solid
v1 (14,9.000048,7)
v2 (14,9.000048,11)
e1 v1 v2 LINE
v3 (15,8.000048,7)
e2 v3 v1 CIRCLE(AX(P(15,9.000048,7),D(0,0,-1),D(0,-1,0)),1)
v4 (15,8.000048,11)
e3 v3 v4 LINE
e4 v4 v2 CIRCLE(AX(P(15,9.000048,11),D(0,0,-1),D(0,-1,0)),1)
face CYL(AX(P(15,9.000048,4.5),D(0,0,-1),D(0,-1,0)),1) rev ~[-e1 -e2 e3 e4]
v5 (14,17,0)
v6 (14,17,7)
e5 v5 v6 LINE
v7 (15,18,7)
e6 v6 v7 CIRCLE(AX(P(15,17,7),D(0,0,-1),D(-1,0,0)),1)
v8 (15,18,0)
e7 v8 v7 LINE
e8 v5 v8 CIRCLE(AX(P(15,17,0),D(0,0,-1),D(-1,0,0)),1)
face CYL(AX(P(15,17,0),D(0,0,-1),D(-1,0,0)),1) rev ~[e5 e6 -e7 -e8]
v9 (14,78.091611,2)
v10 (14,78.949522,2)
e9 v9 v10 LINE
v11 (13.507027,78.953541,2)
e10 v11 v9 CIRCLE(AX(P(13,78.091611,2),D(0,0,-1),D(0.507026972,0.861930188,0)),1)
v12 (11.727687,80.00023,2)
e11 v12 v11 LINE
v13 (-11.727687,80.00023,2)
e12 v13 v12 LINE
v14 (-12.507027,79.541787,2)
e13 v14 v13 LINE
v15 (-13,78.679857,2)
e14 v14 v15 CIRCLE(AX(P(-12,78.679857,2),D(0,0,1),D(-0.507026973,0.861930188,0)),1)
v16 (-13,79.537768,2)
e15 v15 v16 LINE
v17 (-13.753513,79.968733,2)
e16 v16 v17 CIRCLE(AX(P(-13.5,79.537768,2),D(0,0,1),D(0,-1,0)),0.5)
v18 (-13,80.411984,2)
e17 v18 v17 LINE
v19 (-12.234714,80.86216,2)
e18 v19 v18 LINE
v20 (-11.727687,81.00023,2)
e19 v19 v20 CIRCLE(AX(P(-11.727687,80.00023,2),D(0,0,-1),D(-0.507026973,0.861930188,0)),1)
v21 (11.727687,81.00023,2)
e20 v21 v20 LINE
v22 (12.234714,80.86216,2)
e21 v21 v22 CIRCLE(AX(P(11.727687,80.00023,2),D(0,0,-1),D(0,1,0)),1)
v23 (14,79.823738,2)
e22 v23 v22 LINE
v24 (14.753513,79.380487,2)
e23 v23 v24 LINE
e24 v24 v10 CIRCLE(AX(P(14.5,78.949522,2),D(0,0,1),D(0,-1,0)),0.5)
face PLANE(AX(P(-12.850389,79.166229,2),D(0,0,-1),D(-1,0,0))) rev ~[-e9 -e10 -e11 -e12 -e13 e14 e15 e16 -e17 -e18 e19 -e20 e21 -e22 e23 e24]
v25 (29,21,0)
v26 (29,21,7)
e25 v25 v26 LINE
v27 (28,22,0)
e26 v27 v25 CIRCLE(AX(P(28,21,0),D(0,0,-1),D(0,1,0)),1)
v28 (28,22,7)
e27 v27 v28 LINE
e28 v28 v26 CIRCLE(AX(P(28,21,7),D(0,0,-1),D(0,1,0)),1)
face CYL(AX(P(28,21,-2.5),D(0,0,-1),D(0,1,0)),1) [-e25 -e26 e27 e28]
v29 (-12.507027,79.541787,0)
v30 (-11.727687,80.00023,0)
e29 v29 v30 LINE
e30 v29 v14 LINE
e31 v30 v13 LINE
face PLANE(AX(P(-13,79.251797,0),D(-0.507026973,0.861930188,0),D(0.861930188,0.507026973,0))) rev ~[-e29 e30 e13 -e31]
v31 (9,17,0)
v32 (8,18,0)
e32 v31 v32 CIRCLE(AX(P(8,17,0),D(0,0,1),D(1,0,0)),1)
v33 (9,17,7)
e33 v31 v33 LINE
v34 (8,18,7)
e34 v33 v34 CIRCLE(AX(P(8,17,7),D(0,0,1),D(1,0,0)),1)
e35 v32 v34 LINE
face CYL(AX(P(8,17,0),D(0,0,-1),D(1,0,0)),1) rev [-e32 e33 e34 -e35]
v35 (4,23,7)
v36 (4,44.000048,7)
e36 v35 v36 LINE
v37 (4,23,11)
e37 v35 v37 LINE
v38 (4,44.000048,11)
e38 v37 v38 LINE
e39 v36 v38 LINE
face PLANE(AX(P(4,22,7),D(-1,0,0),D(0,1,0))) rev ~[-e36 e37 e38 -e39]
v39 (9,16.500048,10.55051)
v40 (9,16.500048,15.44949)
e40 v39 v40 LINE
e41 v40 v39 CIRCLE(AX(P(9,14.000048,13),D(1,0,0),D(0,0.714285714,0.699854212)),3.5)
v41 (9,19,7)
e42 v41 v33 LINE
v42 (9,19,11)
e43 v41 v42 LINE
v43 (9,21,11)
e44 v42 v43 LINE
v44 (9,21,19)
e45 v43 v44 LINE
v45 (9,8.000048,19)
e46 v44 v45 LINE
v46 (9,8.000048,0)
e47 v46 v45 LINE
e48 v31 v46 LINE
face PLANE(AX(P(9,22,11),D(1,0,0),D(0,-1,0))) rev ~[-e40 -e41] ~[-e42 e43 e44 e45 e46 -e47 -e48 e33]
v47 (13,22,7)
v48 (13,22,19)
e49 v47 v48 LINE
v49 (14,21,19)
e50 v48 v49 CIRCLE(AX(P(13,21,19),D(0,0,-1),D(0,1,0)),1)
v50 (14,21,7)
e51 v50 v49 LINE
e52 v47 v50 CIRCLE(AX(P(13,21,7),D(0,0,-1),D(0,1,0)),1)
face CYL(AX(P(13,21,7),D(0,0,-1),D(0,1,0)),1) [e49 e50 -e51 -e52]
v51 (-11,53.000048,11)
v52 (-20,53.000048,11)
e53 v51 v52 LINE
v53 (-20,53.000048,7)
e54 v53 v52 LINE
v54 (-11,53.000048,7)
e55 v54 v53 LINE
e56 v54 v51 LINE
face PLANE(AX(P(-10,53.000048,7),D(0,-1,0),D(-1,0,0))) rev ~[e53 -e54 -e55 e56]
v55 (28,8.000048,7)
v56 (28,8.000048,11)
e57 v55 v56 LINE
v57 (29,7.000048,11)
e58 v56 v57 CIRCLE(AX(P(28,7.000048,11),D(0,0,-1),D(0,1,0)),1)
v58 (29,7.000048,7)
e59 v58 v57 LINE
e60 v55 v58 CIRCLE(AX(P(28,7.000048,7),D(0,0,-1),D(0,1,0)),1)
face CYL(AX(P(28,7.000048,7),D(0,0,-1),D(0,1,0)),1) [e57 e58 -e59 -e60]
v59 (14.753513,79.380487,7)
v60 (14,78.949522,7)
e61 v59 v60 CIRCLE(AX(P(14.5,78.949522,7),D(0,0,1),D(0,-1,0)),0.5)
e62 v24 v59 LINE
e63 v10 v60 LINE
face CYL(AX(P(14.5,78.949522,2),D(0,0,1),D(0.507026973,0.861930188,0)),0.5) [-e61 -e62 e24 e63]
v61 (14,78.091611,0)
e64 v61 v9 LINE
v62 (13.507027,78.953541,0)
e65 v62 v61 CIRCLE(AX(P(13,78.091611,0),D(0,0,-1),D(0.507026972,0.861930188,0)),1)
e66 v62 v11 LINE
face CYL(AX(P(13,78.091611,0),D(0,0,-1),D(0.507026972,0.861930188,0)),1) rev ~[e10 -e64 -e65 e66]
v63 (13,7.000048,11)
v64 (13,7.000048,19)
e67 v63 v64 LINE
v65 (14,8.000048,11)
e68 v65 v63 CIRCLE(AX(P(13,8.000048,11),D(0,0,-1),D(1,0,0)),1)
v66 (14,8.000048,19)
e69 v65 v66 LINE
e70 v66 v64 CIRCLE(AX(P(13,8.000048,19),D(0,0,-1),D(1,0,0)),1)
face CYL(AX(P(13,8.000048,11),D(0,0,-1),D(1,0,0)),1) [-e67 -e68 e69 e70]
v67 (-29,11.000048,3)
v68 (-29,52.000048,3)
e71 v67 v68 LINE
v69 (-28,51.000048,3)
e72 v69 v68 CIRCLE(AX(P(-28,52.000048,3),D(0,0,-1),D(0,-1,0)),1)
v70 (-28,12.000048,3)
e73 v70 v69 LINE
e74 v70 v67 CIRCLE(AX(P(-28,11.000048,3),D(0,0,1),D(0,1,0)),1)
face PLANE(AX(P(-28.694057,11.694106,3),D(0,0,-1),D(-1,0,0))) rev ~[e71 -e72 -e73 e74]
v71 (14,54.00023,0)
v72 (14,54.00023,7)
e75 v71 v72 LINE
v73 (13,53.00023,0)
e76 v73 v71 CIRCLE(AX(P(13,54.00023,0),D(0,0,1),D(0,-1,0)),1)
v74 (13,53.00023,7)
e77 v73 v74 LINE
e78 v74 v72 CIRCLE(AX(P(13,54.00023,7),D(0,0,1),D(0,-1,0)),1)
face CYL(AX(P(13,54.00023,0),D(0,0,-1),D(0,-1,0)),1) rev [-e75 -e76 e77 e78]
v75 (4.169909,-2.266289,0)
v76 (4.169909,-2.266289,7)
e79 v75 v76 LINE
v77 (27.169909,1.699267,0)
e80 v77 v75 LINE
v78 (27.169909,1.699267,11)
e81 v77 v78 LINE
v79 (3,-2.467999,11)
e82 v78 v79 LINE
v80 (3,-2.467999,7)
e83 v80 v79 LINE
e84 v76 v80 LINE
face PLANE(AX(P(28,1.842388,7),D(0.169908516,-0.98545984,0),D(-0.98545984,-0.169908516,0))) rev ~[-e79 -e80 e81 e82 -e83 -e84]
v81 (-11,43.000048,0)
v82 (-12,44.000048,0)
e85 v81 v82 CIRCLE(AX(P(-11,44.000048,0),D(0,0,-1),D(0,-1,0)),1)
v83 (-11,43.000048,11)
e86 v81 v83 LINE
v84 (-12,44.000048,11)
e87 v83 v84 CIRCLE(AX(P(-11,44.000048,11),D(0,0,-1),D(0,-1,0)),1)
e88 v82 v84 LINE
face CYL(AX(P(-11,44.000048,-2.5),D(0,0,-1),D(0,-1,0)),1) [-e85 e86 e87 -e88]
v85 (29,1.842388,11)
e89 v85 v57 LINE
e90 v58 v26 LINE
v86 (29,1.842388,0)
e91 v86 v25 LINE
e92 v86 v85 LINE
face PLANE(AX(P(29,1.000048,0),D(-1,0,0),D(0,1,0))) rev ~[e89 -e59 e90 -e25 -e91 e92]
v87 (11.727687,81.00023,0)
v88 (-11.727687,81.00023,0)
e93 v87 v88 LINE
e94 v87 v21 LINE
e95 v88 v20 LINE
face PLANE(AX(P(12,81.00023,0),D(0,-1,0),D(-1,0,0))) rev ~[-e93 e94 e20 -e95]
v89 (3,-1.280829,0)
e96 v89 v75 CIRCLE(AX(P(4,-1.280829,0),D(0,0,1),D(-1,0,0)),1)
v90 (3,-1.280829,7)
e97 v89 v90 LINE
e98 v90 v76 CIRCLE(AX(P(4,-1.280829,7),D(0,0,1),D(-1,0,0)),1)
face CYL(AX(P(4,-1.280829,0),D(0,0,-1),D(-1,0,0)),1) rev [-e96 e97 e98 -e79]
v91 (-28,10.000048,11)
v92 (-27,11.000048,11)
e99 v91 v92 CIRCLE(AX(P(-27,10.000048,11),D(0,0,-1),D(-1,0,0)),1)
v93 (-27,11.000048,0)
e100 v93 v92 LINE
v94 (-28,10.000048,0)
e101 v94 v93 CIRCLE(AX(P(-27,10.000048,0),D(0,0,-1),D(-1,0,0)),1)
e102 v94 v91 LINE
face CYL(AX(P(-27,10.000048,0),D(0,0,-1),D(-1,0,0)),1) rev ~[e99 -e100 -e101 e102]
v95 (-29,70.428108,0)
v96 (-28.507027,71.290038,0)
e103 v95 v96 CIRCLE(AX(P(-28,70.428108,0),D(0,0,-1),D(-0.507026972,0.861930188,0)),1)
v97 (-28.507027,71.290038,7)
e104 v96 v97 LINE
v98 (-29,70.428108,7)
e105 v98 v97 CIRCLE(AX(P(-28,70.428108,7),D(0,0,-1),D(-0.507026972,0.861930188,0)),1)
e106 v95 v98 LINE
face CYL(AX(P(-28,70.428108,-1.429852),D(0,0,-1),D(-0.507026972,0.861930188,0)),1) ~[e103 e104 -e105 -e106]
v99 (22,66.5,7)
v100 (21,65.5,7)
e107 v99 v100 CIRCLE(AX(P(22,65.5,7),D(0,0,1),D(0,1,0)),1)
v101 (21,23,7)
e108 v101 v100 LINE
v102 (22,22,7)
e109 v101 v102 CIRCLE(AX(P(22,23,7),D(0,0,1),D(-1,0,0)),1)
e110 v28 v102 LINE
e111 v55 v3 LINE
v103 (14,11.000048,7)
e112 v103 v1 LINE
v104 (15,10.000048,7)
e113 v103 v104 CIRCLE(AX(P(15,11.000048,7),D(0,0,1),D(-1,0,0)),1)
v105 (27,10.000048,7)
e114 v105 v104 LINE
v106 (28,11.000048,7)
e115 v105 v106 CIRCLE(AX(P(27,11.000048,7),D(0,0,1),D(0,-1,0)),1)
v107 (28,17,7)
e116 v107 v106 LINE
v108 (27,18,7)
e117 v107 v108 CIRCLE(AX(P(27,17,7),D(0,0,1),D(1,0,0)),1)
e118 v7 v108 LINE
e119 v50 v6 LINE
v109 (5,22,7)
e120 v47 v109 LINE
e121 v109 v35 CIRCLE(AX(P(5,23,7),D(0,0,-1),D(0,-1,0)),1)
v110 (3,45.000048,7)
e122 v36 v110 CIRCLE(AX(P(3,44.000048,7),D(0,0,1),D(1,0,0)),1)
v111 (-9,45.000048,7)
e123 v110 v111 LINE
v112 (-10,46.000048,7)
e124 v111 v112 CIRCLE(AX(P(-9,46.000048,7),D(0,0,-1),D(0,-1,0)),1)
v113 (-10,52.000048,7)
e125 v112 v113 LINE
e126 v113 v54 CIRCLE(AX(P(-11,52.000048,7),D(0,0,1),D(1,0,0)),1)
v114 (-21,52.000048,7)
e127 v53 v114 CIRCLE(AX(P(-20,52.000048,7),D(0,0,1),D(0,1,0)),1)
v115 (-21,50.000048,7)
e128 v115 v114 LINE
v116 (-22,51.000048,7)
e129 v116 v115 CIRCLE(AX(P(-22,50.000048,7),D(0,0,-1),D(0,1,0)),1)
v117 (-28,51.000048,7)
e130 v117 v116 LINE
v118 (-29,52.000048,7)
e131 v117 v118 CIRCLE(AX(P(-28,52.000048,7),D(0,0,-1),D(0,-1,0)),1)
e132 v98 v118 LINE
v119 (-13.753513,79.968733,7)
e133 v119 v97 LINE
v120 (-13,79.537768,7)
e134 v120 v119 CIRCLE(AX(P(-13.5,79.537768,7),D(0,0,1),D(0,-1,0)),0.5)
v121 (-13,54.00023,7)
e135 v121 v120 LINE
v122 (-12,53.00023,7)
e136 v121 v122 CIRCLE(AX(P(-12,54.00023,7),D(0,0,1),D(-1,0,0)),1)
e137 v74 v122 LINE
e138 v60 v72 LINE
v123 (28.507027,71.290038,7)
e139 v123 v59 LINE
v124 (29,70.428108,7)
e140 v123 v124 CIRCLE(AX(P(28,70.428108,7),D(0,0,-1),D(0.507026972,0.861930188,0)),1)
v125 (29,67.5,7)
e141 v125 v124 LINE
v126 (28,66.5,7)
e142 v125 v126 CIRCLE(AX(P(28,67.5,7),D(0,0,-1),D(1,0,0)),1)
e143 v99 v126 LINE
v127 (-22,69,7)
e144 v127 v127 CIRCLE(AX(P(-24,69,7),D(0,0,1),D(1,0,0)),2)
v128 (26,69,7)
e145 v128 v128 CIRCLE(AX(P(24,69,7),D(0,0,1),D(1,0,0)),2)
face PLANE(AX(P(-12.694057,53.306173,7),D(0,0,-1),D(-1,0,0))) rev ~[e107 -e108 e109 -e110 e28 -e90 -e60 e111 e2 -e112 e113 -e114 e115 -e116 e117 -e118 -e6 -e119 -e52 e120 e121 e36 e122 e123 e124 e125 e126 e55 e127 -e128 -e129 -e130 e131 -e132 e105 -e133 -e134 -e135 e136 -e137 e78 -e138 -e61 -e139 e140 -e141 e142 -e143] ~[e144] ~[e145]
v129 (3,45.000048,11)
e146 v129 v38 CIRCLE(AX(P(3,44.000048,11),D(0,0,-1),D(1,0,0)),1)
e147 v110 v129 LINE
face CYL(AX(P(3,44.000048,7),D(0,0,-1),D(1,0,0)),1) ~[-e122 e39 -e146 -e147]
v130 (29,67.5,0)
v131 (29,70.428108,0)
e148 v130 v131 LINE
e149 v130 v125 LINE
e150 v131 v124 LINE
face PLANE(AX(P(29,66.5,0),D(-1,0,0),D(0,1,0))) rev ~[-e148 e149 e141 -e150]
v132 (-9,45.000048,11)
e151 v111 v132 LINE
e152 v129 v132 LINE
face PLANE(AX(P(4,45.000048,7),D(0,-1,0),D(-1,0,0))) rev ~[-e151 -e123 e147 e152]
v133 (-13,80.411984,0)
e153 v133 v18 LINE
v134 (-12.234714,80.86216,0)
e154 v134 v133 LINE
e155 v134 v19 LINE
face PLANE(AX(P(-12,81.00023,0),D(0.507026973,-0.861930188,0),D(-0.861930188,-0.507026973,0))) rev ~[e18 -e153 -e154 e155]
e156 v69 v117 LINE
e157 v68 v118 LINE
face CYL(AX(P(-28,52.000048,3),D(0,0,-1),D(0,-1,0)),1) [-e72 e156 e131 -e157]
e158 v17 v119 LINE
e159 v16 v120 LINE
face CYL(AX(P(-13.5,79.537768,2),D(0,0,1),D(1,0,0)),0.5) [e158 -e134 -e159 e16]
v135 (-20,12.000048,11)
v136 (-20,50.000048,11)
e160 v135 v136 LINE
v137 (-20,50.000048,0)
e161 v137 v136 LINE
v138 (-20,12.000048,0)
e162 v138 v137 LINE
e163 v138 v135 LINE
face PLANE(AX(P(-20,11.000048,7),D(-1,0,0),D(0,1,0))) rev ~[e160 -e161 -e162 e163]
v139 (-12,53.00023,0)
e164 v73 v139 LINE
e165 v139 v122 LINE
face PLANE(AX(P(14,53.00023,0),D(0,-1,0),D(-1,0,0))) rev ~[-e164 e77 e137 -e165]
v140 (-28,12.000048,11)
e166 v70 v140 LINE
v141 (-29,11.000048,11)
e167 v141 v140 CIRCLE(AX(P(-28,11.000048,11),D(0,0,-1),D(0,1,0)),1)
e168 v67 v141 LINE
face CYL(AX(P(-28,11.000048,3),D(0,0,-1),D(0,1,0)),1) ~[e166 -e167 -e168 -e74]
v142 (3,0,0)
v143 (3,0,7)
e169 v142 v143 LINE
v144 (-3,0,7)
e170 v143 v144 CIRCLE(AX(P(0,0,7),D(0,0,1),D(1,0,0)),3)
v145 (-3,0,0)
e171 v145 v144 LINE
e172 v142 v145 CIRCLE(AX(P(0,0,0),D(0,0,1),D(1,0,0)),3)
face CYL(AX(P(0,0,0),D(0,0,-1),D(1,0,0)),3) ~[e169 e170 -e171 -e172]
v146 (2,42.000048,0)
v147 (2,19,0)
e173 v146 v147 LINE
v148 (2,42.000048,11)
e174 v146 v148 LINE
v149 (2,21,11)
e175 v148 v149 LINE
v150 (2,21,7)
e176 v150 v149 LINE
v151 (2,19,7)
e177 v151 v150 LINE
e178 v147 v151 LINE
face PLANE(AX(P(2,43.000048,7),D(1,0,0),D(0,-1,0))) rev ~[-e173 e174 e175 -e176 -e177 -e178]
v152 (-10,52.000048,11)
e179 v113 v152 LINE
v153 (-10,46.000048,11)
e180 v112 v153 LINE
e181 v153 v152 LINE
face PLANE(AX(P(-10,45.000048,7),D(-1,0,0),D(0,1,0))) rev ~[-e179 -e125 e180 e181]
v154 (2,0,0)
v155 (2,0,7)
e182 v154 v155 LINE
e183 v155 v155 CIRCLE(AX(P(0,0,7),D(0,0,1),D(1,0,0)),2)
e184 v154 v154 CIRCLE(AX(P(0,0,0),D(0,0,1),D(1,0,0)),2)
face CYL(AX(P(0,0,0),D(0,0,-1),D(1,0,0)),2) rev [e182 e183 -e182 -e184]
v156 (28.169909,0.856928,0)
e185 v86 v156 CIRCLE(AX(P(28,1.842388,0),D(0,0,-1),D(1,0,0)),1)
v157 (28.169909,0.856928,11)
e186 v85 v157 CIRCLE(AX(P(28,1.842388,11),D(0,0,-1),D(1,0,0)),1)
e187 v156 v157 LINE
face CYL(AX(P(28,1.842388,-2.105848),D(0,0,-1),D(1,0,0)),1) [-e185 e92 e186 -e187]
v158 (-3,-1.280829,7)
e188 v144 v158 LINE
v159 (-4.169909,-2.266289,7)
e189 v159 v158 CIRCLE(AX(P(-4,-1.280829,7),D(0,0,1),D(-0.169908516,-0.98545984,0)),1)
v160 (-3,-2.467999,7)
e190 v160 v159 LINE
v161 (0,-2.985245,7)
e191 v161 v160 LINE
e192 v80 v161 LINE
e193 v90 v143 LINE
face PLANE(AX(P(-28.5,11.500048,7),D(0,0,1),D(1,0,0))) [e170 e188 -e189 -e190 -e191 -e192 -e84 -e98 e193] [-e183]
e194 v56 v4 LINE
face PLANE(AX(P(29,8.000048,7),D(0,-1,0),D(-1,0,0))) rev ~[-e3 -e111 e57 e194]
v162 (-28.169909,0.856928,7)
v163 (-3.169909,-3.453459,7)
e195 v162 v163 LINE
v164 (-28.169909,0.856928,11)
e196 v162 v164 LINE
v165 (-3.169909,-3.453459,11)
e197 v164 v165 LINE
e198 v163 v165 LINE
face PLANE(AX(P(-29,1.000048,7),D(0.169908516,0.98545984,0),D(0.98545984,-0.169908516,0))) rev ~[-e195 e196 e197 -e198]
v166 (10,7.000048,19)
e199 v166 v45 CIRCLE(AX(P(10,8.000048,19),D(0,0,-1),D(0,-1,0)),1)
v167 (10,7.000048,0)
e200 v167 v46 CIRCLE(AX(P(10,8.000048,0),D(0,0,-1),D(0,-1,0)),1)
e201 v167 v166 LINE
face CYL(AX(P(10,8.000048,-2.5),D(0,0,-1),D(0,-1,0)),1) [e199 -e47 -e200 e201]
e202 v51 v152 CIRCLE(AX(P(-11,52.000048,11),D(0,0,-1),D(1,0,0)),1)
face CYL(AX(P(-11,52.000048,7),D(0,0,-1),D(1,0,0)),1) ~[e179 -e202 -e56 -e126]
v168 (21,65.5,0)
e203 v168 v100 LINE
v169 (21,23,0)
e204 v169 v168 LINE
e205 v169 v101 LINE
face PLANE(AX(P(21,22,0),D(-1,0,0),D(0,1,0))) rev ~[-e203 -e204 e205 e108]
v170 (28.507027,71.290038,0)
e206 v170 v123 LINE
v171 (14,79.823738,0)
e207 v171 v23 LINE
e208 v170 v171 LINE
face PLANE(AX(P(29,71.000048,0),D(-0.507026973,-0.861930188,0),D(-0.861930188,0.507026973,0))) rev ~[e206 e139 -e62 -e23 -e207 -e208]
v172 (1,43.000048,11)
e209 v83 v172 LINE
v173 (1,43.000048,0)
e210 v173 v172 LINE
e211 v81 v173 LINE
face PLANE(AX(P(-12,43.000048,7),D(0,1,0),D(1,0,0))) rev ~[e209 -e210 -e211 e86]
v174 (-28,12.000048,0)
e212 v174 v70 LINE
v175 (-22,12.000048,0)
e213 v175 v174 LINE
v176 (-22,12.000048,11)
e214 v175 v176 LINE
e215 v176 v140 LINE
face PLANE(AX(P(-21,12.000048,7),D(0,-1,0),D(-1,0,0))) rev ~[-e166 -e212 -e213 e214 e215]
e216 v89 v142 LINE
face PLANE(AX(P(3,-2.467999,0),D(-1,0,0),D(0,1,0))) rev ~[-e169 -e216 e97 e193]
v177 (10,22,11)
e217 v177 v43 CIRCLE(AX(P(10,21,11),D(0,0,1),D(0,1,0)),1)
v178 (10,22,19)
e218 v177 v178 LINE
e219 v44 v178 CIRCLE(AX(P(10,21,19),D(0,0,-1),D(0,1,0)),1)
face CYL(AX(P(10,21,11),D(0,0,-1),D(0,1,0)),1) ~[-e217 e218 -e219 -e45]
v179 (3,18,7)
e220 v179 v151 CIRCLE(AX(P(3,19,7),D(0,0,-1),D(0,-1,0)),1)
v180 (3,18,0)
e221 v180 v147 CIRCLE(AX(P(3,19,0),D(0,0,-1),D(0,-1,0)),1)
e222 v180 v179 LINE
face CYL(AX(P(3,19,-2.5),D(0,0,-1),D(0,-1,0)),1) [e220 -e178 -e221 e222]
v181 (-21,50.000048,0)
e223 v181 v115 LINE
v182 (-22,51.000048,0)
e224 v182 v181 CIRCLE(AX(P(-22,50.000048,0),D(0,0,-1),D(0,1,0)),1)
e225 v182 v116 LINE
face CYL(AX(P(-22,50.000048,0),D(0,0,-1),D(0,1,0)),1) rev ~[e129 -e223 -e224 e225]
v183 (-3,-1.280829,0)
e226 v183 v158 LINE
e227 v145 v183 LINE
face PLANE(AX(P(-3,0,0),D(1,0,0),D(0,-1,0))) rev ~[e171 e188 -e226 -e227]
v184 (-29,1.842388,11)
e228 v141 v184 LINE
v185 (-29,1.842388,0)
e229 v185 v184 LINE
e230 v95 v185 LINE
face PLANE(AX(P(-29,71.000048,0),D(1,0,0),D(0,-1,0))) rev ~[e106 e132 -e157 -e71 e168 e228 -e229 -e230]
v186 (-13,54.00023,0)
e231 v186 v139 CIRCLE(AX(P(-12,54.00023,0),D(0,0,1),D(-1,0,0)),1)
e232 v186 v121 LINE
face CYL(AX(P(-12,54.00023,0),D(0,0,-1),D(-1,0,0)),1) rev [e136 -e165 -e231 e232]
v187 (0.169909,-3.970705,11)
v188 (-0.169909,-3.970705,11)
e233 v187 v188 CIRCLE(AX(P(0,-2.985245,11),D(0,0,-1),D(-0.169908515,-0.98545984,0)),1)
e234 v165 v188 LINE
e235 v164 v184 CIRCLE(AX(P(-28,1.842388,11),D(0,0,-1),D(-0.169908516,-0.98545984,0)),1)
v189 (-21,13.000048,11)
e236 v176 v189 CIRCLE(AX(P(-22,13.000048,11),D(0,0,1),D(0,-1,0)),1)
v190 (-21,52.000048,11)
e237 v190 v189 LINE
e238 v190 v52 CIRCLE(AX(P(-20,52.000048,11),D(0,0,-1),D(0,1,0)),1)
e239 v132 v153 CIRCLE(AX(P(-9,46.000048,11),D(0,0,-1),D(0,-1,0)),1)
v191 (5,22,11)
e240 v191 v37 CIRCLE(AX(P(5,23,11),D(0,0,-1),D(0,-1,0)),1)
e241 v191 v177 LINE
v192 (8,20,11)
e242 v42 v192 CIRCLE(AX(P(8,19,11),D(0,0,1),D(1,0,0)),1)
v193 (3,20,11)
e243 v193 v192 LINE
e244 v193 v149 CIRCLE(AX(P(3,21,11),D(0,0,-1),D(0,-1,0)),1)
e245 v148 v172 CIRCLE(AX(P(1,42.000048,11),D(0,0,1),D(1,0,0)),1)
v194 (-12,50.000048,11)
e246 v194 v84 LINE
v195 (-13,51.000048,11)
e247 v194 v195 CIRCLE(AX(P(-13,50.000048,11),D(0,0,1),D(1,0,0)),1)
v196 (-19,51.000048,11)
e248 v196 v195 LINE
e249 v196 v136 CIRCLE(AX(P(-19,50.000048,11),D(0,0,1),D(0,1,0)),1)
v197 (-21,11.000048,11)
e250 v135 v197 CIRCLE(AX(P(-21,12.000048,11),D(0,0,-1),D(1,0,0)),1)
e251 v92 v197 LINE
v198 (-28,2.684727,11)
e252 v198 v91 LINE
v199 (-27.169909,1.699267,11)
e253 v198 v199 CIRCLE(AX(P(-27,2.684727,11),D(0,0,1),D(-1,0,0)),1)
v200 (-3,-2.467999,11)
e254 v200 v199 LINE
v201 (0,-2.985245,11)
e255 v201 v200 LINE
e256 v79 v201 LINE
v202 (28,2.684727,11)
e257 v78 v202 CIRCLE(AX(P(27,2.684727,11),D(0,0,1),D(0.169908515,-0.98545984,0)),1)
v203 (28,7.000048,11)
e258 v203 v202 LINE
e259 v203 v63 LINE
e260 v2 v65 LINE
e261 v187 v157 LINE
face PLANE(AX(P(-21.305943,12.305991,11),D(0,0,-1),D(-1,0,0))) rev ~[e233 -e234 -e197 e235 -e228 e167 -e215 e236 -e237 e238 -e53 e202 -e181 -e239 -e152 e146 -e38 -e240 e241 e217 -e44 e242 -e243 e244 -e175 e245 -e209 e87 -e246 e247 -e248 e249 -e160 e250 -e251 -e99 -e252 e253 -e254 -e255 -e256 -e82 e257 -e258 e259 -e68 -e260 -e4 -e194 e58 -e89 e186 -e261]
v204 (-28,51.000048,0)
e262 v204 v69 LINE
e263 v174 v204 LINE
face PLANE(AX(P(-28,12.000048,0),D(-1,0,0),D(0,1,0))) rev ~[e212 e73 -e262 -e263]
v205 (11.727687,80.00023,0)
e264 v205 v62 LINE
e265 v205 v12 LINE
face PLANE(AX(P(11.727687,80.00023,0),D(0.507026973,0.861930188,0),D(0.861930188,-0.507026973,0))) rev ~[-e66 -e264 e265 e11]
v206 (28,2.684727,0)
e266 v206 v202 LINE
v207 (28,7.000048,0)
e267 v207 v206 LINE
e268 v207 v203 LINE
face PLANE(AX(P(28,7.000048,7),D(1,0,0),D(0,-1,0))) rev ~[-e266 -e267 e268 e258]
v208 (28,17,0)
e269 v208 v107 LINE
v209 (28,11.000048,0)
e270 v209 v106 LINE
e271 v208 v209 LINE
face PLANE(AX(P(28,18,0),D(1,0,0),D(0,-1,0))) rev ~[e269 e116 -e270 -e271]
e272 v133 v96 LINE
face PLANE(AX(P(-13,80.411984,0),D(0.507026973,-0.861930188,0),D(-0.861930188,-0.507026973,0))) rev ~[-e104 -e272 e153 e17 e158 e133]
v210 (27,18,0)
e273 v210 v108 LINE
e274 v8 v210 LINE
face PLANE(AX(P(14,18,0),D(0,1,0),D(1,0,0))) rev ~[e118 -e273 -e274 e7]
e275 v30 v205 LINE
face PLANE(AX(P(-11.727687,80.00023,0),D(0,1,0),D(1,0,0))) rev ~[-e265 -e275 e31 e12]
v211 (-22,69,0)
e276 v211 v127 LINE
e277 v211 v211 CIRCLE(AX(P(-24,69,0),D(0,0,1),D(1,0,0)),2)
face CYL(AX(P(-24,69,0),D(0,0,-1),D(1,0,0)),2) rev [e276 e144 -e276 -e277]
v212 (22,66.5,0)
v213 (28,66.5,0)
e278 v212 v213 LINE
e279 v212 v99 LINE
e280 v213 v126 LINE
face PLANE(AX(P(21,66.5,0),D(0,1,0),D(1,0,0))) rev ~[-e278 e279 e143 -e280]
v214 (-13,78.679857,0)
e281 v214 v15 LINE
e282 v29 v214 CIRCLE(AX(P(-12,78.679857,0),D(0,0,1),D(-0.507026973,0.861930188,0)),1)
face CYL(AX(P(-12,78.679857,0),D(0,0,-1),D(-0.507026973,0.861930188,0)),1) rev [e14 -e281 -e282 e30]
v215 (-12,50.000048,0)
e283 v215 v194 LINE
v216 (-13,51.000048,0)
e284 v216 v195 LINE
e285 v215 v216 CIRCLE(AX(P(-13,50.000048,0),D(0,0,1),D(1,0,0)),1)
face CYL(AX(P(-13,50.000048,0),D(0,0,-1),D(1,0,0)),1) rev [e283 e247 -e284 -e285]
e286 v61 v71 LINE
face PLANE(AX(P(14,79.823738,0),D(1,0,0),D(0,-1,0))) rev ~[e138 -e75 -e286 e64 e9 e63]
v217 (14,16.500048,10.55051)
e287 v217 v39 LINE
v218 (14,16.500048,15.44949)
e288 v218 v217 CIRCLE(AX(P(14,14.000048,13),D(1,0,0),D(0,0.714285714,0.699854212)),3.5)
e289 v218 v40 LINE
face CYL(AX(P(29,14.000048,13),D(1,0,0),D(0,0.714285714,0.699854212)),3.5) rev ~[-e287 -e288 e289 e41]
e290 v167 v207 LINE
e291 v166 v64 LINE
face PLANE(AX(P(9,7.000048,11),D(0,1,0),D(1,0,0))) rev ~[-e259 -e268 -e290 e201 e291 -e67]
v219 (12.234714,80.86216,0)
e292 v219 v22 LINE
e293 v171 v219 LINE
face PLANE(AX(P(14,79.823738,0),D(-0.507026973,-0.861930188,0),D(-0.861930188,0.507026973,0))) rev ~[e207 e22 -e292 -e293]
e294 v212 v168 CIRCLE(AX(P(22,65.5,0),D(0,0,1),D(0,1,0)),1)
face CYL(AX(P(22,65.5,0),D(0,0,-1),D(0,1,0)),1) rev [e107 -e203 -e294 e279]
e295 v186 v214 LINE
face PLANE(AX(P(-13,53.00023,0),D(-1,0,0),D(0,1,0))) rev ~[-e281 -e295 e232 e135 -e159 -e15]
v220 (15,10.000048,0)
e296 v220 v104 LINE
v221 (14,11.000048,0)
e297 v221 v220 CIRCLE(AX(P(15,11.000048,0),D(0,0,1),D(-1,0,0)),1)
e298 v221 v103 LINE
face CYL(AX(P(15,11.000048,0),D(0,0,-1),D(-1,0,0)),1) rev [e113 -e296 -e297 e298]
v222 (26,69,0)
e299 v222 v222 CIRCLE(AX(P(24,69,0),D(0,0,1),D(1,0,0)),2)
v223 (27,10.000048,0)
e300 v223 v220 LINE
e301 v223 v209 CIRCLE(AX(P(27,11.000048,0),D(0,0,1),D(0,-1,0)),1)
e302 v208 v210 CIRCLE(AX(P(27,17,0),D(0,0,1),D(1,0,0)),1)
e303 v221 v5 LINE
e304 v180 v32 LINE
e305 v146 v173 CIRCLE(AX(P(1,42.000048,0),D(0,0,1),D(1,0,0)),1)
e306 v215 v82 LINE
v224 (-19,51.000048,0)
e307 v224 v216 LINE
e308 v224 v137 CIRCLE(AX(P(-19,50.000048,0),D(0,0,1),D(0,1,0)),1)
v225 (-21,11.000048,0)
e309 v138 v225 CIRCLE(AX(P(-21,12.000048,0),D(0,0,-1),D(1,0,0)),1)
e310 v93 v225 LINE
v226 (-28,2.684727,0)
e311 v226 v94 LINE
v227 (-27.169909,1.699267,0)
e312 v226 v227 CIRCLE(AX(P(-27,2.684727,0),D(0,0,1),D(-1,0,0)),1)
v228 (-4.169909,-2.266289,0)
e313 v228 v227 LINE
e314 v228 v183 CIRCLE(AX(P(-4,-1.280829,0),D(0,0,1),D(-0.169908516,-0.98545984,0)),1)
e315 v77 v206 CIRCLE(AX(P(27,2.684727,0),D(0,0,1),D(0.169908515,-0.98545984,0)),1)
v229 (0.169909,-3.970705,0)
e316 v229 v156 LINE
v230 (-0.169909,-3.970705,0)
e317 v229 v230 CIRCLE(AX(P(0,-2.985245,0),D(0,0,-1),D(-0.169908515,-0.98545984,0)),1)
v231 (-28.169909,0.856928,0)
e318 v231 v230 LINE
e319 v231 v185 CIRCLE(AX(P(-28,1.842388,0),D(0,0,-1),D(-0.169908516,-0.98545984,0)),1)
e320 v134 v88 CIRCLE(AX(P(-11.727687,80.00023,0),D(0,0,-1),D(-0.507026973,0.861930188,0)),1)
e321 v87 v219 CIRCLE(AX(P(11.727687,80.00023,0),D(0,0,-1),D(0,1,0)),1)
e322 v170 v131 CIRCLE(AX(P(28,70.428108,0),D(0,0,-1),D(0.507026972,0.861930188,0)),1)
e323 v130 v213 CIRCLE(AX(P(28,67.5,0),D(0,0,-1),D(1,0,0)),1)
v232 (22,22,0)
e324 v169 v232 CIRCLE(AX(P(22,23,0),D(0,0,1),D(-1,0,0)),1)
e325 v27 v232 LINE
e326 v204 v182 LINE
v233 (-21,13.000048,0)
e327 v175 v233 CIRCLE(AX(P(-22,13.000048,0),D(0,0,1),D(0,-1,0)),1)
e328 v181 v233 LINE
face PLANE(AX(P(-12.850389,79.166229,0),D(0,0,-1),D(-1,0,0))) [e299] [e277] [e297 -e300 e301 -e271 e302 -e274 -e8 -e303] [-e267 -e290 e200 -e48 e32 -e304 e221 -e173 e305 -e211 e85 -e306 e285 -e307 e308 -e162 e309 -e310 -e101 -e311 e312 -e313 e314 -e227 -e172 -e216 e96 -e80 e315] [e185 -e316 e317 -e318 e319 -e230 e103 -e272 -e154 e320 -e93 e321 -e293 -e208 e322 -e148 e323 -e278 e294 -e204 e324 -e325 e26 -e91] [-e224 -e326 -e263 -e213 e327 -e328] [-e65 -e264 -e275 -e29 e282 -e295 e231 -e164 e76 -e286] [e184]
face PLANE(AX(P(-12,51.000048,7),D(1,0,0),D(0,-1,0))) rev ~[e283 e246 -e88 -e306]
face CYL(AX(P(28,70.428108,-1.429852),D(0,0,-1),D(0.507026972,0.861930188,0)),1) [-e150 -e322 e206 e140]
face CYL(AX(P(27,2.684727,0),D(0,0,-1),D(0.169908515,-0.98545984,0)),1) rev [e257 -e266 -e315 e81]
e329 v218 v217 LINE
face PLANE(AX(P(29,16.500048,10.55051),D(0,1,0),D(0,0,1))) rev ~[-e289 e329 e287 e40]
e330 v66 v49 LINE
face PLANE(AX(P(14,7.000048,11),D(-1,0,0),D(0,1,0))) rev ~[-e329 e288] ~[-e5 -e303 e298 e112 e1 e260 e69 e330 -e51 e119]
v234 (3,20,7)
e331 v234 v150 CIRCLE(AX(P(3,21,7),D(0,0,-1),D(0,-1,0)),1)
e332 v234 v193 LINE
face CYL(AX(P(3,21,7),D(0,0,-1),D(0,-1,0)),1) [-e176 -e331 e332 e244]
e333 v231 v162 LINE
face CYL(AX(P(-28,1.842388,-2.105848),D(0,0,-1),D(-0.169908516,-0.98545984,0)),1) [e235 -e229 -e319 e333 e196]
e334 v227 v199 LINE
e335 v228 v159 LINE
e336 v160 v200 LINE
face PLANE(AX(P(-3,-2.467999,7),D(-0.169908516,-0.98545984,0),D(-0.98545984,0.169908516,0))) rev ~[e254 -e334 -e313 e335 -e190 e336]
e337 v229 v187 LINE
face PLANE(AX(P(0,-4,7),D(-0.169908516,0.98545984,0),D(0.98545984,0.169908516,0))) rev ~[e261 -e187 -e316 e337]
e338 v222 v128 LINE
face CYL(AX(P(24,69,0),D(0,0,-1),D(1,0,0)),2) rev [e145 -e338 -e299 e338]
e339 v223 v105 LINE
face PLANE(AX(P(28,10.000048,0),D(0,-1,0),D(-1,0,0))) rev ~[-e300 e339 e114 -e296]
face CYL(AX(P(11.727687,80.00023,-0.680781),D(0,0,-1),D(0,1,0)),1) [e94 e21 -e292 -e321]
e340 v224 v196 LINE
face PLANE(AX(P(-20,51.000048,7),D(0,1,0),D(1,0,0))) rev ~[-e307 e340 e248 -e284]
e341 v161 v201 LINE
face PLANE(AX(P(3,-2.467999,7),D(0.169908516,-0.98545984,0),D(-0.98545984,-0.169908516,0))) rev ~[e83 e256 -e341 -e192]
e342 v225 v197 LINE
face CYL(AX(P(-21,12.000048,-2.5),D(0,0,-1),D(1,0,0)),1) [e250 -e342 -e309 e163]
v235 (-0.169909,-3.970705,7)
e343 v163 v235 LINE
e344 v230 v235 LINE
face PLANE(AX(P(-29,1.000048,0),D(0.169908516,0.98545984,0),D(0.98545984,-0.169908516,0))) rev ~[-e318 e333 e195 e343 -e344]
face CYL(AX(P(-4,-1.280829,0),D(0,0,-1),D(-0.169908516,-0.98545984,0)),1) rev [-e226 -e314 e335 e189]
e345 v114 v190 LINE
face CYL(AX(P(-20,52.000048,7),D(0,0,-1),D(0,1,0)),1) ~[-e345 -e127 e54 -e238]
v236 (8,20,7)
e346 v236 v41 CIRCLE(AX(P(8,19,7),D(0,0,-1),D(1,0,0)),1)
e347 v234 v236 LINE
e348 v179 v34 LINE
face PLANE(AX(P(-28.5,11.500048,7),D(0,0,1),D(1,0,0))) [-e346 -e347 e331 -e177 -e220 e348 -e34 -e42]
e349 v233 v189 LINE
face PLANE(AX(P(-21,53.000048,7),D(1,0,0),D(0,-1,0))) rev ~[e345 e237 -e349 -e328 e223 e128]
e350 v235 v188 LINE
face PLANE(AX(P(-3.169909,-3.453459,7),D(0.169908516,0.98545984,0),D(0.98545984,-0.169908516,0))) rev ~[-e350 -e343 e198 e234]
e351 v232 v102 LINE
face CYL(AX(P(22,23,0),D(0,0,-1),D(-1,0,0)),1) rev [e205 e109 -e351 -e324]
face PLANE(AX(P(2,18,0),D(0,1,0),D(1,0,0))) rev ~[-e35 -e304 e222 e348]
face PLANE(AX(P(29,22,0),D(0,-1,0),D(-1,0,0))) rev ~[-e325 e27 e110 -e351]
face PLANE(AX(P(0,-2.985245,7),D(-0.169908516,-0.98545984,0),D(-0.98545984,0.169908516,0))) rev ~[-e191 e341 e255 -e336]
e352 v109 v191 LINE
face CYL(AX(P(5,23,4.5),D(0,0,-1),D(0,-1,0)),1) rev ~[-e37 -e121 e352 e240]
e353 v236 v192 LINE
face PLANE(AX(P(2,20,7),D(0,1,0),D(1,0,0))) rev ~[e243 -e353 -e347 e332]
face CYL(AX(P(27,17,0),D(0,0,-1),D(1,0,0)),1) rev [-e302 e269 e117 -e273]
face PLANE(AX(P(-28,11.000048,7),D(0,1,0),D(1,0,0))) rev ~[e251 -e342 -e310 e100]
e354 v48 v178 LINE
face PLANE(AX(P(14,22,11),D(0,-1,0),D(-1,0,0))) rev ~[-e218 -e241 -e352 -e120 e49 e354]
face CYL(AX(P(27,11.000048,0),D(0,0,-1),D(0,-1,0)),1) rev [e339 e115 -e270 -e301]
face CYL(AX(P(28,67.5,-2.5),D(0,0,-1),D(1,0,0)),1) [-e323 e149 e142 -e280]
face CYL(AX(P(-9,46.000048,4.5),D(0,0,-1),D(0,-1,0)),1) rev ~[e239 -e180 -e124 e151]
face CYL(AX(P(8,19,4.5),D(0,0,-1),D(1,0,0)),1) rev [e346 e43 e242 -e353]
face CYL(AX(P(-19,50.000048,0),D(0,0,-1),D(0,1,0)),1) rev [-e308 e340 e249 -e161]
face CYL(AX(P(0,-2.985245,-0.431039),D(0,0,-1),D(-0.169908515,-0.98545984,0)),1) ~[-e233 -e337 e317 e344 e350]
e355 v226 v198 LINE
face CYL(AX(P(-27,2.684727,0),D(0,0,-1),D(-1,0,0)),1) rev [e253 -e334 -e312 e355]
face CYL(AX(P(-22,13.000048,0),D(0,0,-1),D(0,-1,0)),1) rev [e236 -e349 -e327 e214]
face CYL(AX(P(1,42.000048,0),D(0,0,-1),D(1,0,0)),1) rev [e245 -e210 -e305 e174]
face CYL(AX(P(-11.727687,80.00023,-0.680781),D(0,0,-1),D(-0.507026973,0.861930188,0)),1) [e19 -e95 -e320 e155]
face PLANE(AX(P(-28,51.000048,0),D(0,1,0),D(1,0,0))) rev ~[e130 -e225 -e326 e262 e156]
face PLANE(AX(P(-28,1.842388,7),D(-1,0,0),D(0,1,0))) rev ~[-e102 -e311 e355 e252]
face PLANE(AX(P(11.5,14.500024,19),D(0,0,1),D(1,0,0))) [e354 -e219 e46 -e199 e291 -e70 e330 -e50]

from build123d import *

# Parameters (mm, degrees)
F1_W          = 1
F1_H          = 1
F1_R          = 2
F2_DEPTH      = 7
F4_DEPTH      = 4
F6_DEPTH      = 8
F8_DEPTH      = 25
F9_W          = 1
F9_H          = 39
F10_DEPTH     = 4
F11_DEPTH     = 2
F12_T1_DEPTH  = 7
F12_T3_DEPTH  = 6.5
F12_T5_DEPTH  = 11
F12_T7_DEPTH  = 2
F12_T9_DEPTH  = 9.8597039194
F12_T11_DEPTH = 6.5
F12_T13_DEPTH = 12
F12_T15_DEPTH = 15.2116961582
F12_T17_DEPTH = 10.5
F12_T19_DEPTH = 11.8620773197
F12_T21_DEPTH = 6.5
F12_T23_DEPTH = 3.3615627907
F12_T25_DEPTH = 16
F12_T27_DEPTH = 14.5
F12_T29_DEPTH = 10.5
F12_T31_DEPTH = 24
F13_R         = 0.5


# Not quite as in the source:
# - a fillet or chamfer that OpenCascade refuses, or shapes differently, is made with other operations: its cross-section is extruded or revolved along the edge and cut away or added


with BuildPart() as f2:
    # F1 (on Top) → F2 (new body)
    with BuildSketch(Plane.XY):
        with Locations((-28.5, 11.5000484542)):
            Rectangle(F1_W, F1_H)
        Polygon((-21, 12.0000484542), (-28, 12.0000484542), (-28, 11.0000484542), (-20, 11.0000484542), (-20, 51.0000484542), (-21, 51.0000484542), align=None)
        with BuildLine():
            Line((29, 66.5), (29, 71.0000484542))
            Line((29, 71.0000484542), (14, 79.8237382314))
            Line((14, 79.8237382314), (14, 78.6635514624))
            Line((14, 78.6635514624), (14, 53.0002302017))
            Line((14, 53.0002302017), (-13, 53.0002302017))
            Line((-13, 53.0002302017), (-13, 79.2517974475))
            Line((-13, 79.2517974475), (-13, 80.4119842166))
            Line((-13, 80.4119842166), (-29, 71.0000484542))
            Line((-29, 71.0000484542), (-29, 12.0000484542))
            Line((-29, 12.0000484542), (-28, 12.0000484542))
            Line((-28, 12.0000484542), (-28, 51.0000484542))
            Line((-28, 51.0000484542), (-21, 51.0000484542))
            Line((-21, 51.0000484542), (-20, 51.0000484542))
            Line((-20, 51.0000484542), (-12, 51.0000484542))
            Line((-12, 51.0000484542), (-12, 43.0000484542))
            Line((-12, 43.0000484542), (2, 43.0000484542))
            Line((2, 43.0000484542), (2, 18))
            Line((2, 18), (9, 18))
            Line((9, 18), (14, 18))
            Line((14, 18), (28, 18))
            Line((28, 18), (28, 10.0000484542))
            Line((28, 10.0000484542), (28, 7.0000484542))
            Line((28, 7.0000484542), (28, 1.8423876859))
            Line((28, 1.8423876859), (3, -2.4679989126))
            Line((3, -2.4679989126), (3, 0))
            ThreePointArc((3, 0), (0, 3), (-3, 0))
            Line((-3, 0), (-3, -2.4679989126))
            Line((-3, -2.4679989126), (-28, 1.8423876859))
            Line((-28, 1.8423876859), (-28, 11.0000484542))
            Line((-28, 11.0000484542), (-29, 11.0000484542))
            Line((-29, 11.0000484542), (-29, 1.0000484542))
            Line((-29, 1.0000484542), (0, -4))
            Line((0, -4), (29, 1.0000484542))
            Line((29, 1.0000484542), (29, 22))
            Line((29, 22), (21, 22))
            Line((21, 22), (21, 66.5))
            Line((21, 66.5), (29, 66.5))
        make_face()
        Circle(F1_R, mode=Mode.SUBTRACT)
        with Locations((-24, 69)):
            Circle(F1_R, mode=Mode.SUBTRACT)
        with Locations((24, 69)):
            Circle(F1_R, mode=Mode.SUBTRACT)
        Polygon((9, 7.0000484542), (28, 7.0000484542), (28, 10.0000484542), (14, 10.0000484542), (14, 18), (9, 18), align=None)
    extrude(amount=F2_DEPTH)

    # F3 (on face) → F4 (join)
    with BuildSketch(Plane.XY.offset(7)):
        Polygon((4, 22), (4, 33), (4, 45.0000484542), (-10, 45.0000484542), (-10, 53.0000484542), (-21, 53.0000484542), (-21, 51.0000484542), (-21, 12.0000484542), (-28, 12.0000484542), (-29, 12.0000484542), (-29, 1.0000484542), (-3.1699085155, -3.4534587527), (0, -4), (29, 1.0000484542), (29, 8.0000484542), (14, 8.0000484542), (14, 10.0000484542), (14, 18), (14, 20), (14, 22), align=None)
        Polygon((0, -2.9852453044), (-3, -2.4679989126), (-28, 1.8423876859), (-28, 11.0000484542), (-20, 11.0000484542), (-20, 51.0000484542), (-12, 51.0000484542), (-12, 43.0000484542), (2, 43.0000484542), (2, 33), (2, 31), (2, 20), (9, 20), (9, 18), (9, 7.0000484542), (28, 7.0000484542), (28, 1.8423876859), (3, -2.4679989126), align=None, mode=Mode.SUBTRACT)
    extrude(amount=F4_DEPTH)

    # F5 (on face) → F6 (join)
    with BuildSketch(Plane.XY.offset(11)):
        Polygon((9, 20), (9, 7.0000484542), (14, 7.0000484542), (14, 8.0000484542), (14, 22), (9, 22), align=None)
    extrude(amount=F6_DEPTH)

    # F7 (on face) → F8 (cut)
    with BuildSketch(Plane.YZ.offset(29)):
        with BuildLine():
            Line((16.5000484542, 10.5505102572), (16.5000484542, 15.4494897428))
            ThreePointArc((16.5000484542, 15.4494897428), (10.5000484542, 13), (16.5000484542, 10.5505102572))
        make_face()
    extrude(amount=-F8_DEPTH, mode=Mode.SUBTRACT)

    # F9 (on face) → F10 (cut)
    with BuildSketch(Plane.XY.offset(7)):
        with Locations((-28.5, 31.5000484542)):
            Rectangle(F9_W, F9_H)
    extrude(amount=-F10_DEPTH, mode=Mode.SUBTRACT)

    # F1 (on Top) → F11 (join)
    with BuildSketch(Plane.XY):
        Polygon((14, 78.6635514624), (14, 79.8237382314), (12, 81.0002302017), (-12, 81.0002302017), (-13, 80.4119842166), (-13, 79.2517974475), (-11.7276874419, 80.0002302017), (11.7276874419, 80.0002302017), align=None)
    extrude(amount=F11_DEPTH)

    # F12: fillet of radius 1 on 48 edges, made by hand

    # F12_s2 → F12_t1 (join)
    with BuildSketch(Plane.XY):
        with BuildLine():
            ThreePointArc((-13, 54.0002302017), (-12.7071067812, 53.2931234205), (-12, 53.0002302017))
            Line((-12, 53.0002302017), (-13, 53.0002302017))
            Line((-13, 53.0002302017), (-13, 54.0002302017))
        make_face()
        with BuildLine():
            ThreePointArc((13, 53.0002302017), (13.7071067812, 53.2931234205), (14, 54.0002302017))
            Line((14, 54.0002302017), (14, 53.0002302017))
            Line((14, 53.0002302017), (13, 53.0002302017))
        make_face()
        with BuildLine():
            ThreePointArc((21, 23), (21.2928932188, 22.2928932188), (22, 22))
            Line((22, 22), (21, 22))
            Line((21, 22), (21, 23))
        make_face()
        with BuildLine():
            ThreePointArc((22, 66.5), (21.2928932188, 66.2071067812), (21, 65.5))
            Line((21, 65.5), (21, 66.5))
            Line((21, 66.5), (22, 66.5))
        make_face()
        with BuildLine():
            ThreePointArc((-22, 51.0000484542), (-21.2928932188, 50.7071552354), (-21, 50.0000484542))
            Line((-21, 50.0000484542), (-21, 51.0000484542))
            Line((-21, 51.0000484542), (-22, 51.0000484542))
        make_face()
        with BuildLine():
            ThreePointArc((14, 11.0000484542), (14.2928932188, 10.2929416731), (15, 10.0000484542))
            Line((15, 10.0000484542), (14, 10.0000484542))
            Line((14, 10.0000484542), (14, 11.0000484542))
        make_face()
        with BuildLine():
            ThreePointArc((14, 17), (14.2928932188, 17.7071067812), (15, 18))
            Line((15, 18), (14, 18))
            Line((14, 18), (14, 17))
        make_face()
        with BuildLine():
            ThreePointArc((28, 17), (27.7071067812, 17.7071067812), (27, 18))
            Line((27, 18), (28, 18))
            Line((28, 18), (28, 17))
        make_face()
        with BuildLine():
            ThreePointArc((9, 17), (8.7071067812, 17.7071067812), (8, 18))
            Line((8, 18), (9, 18))
            Line((9, 18), (9, 17))
        make_face()
        with BuildLine():
            ThreePointArc((27, 10.0000484542), (27.7071067812, 10.2929416731), (28, 11.0000484542))
            Line((28, 11.0000484542), (28, 10.0000484542))
            Line((28, 10.0000484542), (27, 10.0000484542))
        make_face()
        with BuildLine():
            ThreePointArc((-4.1699085155, -2.2662885931), (-3.3557595618, -2.0456517769), (-3, -1.2808287531))
            Line((-3, -1.2808287531), (-3, -2.4679989126))
            Line((-3, -2.4679989126), (-4.1699085155, -2.2662885931))
        make_face()
        with BuildLine():
            ThreePointArc((3, -1.2808287531), (3.3557595618, -2.0456517769), (4.1699085155, -2.2662885931))
            Line((4.1699085155, -2.2662885931), (3, -2.4679989126))
            Line((3, -2.4679989126), (3, -1.2808287531))
        make_face()
    extrude(amount=F12_T1_DEPTH)

    # F12_s4 → F12_t3 (join)
    with BuildSketch(Plane.XY.offset(4.5)):
        with BuildLine():
            ThreePointArc((-9, 45.0000484542), (-9.7071067812, 45.2929416731), (-10, 46.0000484542))
            Line((-10, 46.0000484542), (-10, 45.0000484542))
            Line((-10, 45.0000484542), (-9, 45.0000484542))
        make_face()
        with BuildLine():
            ThreePointArc((5, 22), (4.2928932188, 22.2928932188), (4, 23))
            Line((4, 23), (4, 22))
            Line((4, 22), (5, 22))
        make_face()
        with BuildLine():
            ThreePointArc((15, 8.0000484542), (14.2928932188, 8.2929416731), (14, 9.0000484542))
            Line((14, 9.0000484542), (14, 8.0000484542))
            Line((14, 8.0000484542), (15, 8.0000484542))
        make_face()
        with BuildLine():
            ThreePointArc((9, 19), (8.7071067812, 19.7071067812), (8, 20))
            Line((8, 20), (9, 20))
            Line((9, 20), (9, 19))
        make_face()
    extrude(amount=F12_T3_DEPTH)

    # F12_s6 → F12_t5 (join)
    with BuildSketch(Plane.XY):
        with BuildLine():
            ThreePointArc((-22, 12.0000484542), (-21.2928932188, 12.2929416731), (-21, 13.0000484542))
            Line((-21, 13.0000484542), (-21, 12.0000484542))
            Line((-21, 12.0000484542), (-22, 12.0000484542))
        make_face()
        with BuildLine():
            ThreePointArc((2, 42.0000484542), (1.7071067812, 42.7071552354), (1, 43.0000484542))
            Line((1, 43.0000484542), (2, 43.0000484542))
            Line((2, 43.0000484542), (2, 42.0000484542))
        make_face()
        with BuildLine():
            ThreePointArc((-12, 50.0000484542), (-12.2928932188, 50.7071552354), (-13, 51.0000484542))
            Line((-13, 51.0000484542), (-12, 51.0000484542))
            Line((-12, 51.0000484542), (-12, 50.0000484542))
        make_face()
        with BuildLine():
            ThreePointArc((-19, 51.0000484542), (-19.7071067812, 50.7071552354), (-20, 50.0000484542))
            Line((-20, 50.0000484542), (-20, 51.0000484542))
            Line((-20, 51.0000484542), (-19, 51.0000484542))
        make_face()
        with BuildLine():
            ThreePointArc((-28, 10.0000484542), (-27.7071067812, 10.7071552354), (-27, 11.0000484542))
            Line((-27, 11.0000484542), (-28, 11.0000484542))
            Line((-28, 11.0000484542), (-28, 10.0000484542))
        make_face()
        with BuildLine():
            ThreePointArc((-28, 2.6847269175), (-27.7648230238, 2.0404864793), (-27.1699085155, 1.6992670775))
            Line((-27.1699085155, 1.6992670775), (-28, 1.8423876859))
            Line((-28, 1.8423876859), (-28, 2.6847269175))
        make_face()
        with BuildLine():
            ThreePointArc((27.1699085155, 1.6992670775), (27.7648230238, 2.0404864793), (28, 2.6847269175))
            Line((28, 2.6847269175), (28, 1.8423876859))
            Line((28, 1.8423876859), (27.1699085155, 1.6992670775))
        make_face()
    extrude(amount=F12_T5_DEPTH)

    # F12_s8 → F12_t7 (join)
    with BuildSketch(Plane.XY):
        with BuildLine():
            ThreePointArc((-12.5070269726, 79.5417868517), (-12.8680515459, 79.1763307452), (-13, 78.6798566636))
            Line((-13, 78.6798566636), (-13, 79.2517974475))
            Line((-13, 79.2517974475), (-12.5070269726, 79.5417868517))
        make_face()
        with BuildLine():
            ThreePointArc((13.5070269726, 78.9535408665), (13.8680515459, 78.5880847601), (14, 78.0916106785))
            Line((14, 78.0916106785), (14, 78.6635514624))
            Line((14, 78.6635514624), (13.5070269726, 78.9535408665))
        make_face()
    extrude(amount=F12_T7_DEPTH)

    # F12_s10 → F12_t9 (cut)
    with BuildSketch(Plane.XY.offset(-1.4298519597)):
        with BuildLine():
            ThreePointArc((28.5070269726, 71.2900378584), (28.8680515459, 70.924581752), (29, 70.4281076704))
            Line((29, 70.4281076704), (29, 71.0000484542))
            Line((29, 71.0000484542), (28.5070269726, 71.2900378584))
        make_face()
        with BuildLine():
            ThreePointArc((-28.5070269726, 71.2900378584), (-28.8680515459, 70.924581752), (-29, 70.4281076704))
            Line((-29, 70.4281076704), (-29, 71.0000484542))
            Line((-29, 71.0000484542), (-28.5070269726, 71.2900378584))
        make_face()
    extrude(amount=F12_T9_DEPTH, mode=Mode.SUBTRACT)

    # F12_s12 → F12_t11 (cut)
    with BuildSketch(Plane.XY.offset(7)):
        with BuildLine():
            ThreePointArc((4, 44.0000484542), (3.7071067812, 44.7071552354), (3, 45.0000484542))
            Line((3, 45.0000484542), (4, 45.0000484542))
            Line((4, 45.0000484542), (4, 44.0000484542))
        make_face()
        with BuildLine():
            ThreePointArc((-10, 52.0000484542), (-10.2928932188, 52.7071552354), (-11, 53.0000484542))
            Line((-11, 53.0000484542), (-10, 53.0000484542))
            Line((-10, 53.0000484542), (-10, 52.0000484542))
        make_face()
        with BuildLine():
            ThreePointArc((-20, 53.0000484542), (-20.7071067812, 52.7071552354), (-21, 52.0000484542))
            Line((-21, 52.0000484542), (-21, 53.0000484542))
            Line((-21, 53.0000484542), (-20, 53.0000484542))
        make_face()
        with BuildLine():
            ThreePointArc((3, 20), (2.2928932188, 20.2928932188), (2, 21))
            Line((2, 21), (2, 20))
            Line((2, 20), (3, 20))
        make_face()
        with BuildLine():
            ThreePointArc((28, 8.0000484542), (28.7071067812, 7.7071552354), (29, 7.0000484542))
            Line((29, 7.0000484542), (29, 8.0000484542))
            Line((29, 8.0000484542), (28, 8.0000484542))
        make_face()
    extrude(amount=F12_T11_DEPTH, mode=Mode.SUBTRACT)

    # F12_s14 → F12_t13 (cut)
    with BuildSketch(Plane.XY.offset(-2.5)):
        with BuildLine():
            ThreePointArc((28, 22), (28.7071067812, 21.7071067812), (29, 21))
            Line((29, 21), (29, 22))
            Line((29, 22), (28, 22))
        make_face()
        with BuildLine():
            ThreePointArc((29, 67.5), (28.7071067812, 66.7928932188), (28, 66.5))
            Line((28, 66.5), (29, 66.5))
            Line((29, 66.5), (29, 67.5))
        make_face()
        with BuildLine():
            ThreePointArc((3, 18), (2.2928932188, 18.2928932188), (2, 19))
            Line((2, 19), (2, 18))
            Line((2, 18), (3, 18))
        make_face()
    extrude(amount=F12_T13_DEPTH, mode=Mode.SUBTRACT)

    # F12_s16 → F12_t15 (cut)
    with BuildSketch(Plane.XY.offset(-2.1058480791)):
        with BuildLine():
            ThreePointArc((29, 1.8423876859), (28.7648230238, 1.1981472477), (28.1699085155, 0.8569278458))
            Line((28.1699085155, 0.8569278458), (29, 1.0000484542))
            Line((29, 1.0000484542), (29, 1.8423876859))
        make_face()
        with BuildLine():
            ThreePointArc((-28.1699085155, 0.8569278458), (-28.7648230238, 1.1981472477), (-29, 1.8423876859))
            Line((-29, 1.8423876859), (-29, 1.0000484542))
            Line((-29, 1.0000484542), (-28.1699085155, 0.8569278458))
        make_face()
    extrude(amount=F12_T15_DEPTH, mode=Mode.SUBTRACT)

    # F12_s18 → F12_t17 (cut)
    with BuildSketch(Plane.XY.offset(3)):
        with BuildLine():
            ThreePointArc((-28, 12.0000484542), (-28.7071067812, 11.7071552354), (-29, 11.0000484542))
            Line((-29, 11.0000484542), (-29, 12.0000484542))
            Line((-29, 12.0000484542), (-28, 12.0000484542))
        make_face()
    extrude(amount=F12_T17_DEPTH, mode=Mode.SUBTRACT)

    # F12_s20 → F12_t19 (cut)
    with BuildSketch(Plane.XY.offset(-0.4310386598)):
        with BuildLine():
            ThreePointArc((-0.1699085155, -3.9707051445), (0, -3.9852453044), (0.1699085155, -3.9707051445))
            Line((0.1699085155, -3.9707051445), (0, -4))
            Line((0, -4), (-0.1699085155, -3.9707051445))
        make_face()
    extrude(amount=F12_T19_DEPTH, mode=Mode.SUBTRACT)

    # F12_s22 → F12_t21 (cut)
    with BuildSketch(Plane.XY.offset(3)):
        with BuildLine():
            ThreePointArc((-28, 51.0000484542), (-28.7071067812, 51.2929416731), (-29, 52.0000484542))
            Line((-29, 52.0000484542), (-29, 51.0000484542))
            Line((-29, 51.0000484542), (-28, 51.0000484542))
        make_face()
    extrude(amount=F12_T21_DEPTH, mode=Mode.SUBTRACT)

    # F12_s24 → F12_t23 (cut)
    with BuildSketch(Plane.XY.offset(-0.6807813954)):
        with BuildLine():
            ThreePointArc((-12.2347144144, 80.8621603897), (-11.9904323866, 80.965095526), (-11.7276874419, 81.0002302017))
            Line((-11.7276874419, 81.0002302017), (-12, 81.0002302017))
            Line((-12, 81.0002302017), (-12.2347144144, 80.8621603897))
        make_face()
        with BuildLine():
            ThreePointArc((11.7276874419, 81.0002302017), (11.9904323866, 80.965095526), (12.2347144144, 80.8621603897))
            Line((12.2347144144, 80.8621603897), (12, 81.0002302017))
            Line((12, 81.0002302017), (11.7276874419, 81.0002302017))
        make_face()
    extrude(amount=F12_T23_DEPTH, mode=Mode.SUBTRACT)

    # F12_s26 → F12_t25 (cut)
    with BuildSketch(Plane.XY.offset(-2.5)):
        with BuildLine():
            ThreePointArc((-11, 43.0000484542), (-11.7071067812, 43.2929416731), (-12, 44.0000484542))
            Line((-12, 44.0000484542), (-12, 43.0000484542))
            Line((-12, 43.0000484542), (-11, 43.0000484542))
        make_face()
        with BuildLine():
            ThreePointArc((-20, 12.0000484542), (-20.2928932188, 11.2929416731), (-21, 11.0000484542))
            Line((-21, 11.0000484542), (-20, 11.0000484542))
            Line((-20, 11.0000484542), (-20, 12.0000484542))
        make_face()
    extrude(amount=F12_T25_DEPTH, mode=Mode.SUBTRACT)

    # F12_s28 → F12_t27 (cut)
    with BuildSketch(Plane.XY.offset(7)):
        with BuildLine():
            ThreePointArc((13, 22), (13.7071067812, 21.7071067812), (14, 21))
            Line((14, 21), (14, 22))
            Line((14, 22), (13, 22))
        make_face()
    extrude(amount=F12_T27_DEPTH, mode=Mode.SUBTRACT)

    # F12_s30 → F12_t29 (cut)
    with BuildSketch(Plane.XY.offset(11)):
        with BuildLine():
            ThreePointArc((10, 22), (9.2928932188, 21.7071067812), (9, 21))
            Line((9, 21), (9, 22))
            Line((9, 22), (10, 22))
        make_face()
        with BuildLine():
            ThreePointArc((14, 8.0000484542), (13.7071067812, 7.2929416731), (13, 7.0000484542))
            Line((13, 7.0000484542), (14, 7.0000484542))
            Line((14, 7.0000484542), (14, 8.0000484542))
        make_face()
    extrude(amount=F12_T29_DEPTH, mode=Mode.SUBTRACT)

    # F12_s32 → F12_t31 (cut)
    with BuildSketch(Plane.XY.offset(-2.5)):
        with BuildLine():
            ThreePointArc((10, 7.0000484542), (9.2928932188, 7.2929416731), (9, 8.0000484542))
            Line((9, 8.0000484542), (9, 7.0000484542))
            Line((9, 7.0000484542), (10, 7.0000484542))
        make_face()
    extrude(amount=F12_T31_DEPTH, mode=Mode.SUBTRACT)

    # F13
    f13_edges = [f2.edges().sort_by_distance(p)[0] for p in [
        (-13, 80.411984, 4.5),
        (14, 79.823738, 4.5),
    ]]
    fillet(f13_edges, radius=F13_R)


solid = f2.part
